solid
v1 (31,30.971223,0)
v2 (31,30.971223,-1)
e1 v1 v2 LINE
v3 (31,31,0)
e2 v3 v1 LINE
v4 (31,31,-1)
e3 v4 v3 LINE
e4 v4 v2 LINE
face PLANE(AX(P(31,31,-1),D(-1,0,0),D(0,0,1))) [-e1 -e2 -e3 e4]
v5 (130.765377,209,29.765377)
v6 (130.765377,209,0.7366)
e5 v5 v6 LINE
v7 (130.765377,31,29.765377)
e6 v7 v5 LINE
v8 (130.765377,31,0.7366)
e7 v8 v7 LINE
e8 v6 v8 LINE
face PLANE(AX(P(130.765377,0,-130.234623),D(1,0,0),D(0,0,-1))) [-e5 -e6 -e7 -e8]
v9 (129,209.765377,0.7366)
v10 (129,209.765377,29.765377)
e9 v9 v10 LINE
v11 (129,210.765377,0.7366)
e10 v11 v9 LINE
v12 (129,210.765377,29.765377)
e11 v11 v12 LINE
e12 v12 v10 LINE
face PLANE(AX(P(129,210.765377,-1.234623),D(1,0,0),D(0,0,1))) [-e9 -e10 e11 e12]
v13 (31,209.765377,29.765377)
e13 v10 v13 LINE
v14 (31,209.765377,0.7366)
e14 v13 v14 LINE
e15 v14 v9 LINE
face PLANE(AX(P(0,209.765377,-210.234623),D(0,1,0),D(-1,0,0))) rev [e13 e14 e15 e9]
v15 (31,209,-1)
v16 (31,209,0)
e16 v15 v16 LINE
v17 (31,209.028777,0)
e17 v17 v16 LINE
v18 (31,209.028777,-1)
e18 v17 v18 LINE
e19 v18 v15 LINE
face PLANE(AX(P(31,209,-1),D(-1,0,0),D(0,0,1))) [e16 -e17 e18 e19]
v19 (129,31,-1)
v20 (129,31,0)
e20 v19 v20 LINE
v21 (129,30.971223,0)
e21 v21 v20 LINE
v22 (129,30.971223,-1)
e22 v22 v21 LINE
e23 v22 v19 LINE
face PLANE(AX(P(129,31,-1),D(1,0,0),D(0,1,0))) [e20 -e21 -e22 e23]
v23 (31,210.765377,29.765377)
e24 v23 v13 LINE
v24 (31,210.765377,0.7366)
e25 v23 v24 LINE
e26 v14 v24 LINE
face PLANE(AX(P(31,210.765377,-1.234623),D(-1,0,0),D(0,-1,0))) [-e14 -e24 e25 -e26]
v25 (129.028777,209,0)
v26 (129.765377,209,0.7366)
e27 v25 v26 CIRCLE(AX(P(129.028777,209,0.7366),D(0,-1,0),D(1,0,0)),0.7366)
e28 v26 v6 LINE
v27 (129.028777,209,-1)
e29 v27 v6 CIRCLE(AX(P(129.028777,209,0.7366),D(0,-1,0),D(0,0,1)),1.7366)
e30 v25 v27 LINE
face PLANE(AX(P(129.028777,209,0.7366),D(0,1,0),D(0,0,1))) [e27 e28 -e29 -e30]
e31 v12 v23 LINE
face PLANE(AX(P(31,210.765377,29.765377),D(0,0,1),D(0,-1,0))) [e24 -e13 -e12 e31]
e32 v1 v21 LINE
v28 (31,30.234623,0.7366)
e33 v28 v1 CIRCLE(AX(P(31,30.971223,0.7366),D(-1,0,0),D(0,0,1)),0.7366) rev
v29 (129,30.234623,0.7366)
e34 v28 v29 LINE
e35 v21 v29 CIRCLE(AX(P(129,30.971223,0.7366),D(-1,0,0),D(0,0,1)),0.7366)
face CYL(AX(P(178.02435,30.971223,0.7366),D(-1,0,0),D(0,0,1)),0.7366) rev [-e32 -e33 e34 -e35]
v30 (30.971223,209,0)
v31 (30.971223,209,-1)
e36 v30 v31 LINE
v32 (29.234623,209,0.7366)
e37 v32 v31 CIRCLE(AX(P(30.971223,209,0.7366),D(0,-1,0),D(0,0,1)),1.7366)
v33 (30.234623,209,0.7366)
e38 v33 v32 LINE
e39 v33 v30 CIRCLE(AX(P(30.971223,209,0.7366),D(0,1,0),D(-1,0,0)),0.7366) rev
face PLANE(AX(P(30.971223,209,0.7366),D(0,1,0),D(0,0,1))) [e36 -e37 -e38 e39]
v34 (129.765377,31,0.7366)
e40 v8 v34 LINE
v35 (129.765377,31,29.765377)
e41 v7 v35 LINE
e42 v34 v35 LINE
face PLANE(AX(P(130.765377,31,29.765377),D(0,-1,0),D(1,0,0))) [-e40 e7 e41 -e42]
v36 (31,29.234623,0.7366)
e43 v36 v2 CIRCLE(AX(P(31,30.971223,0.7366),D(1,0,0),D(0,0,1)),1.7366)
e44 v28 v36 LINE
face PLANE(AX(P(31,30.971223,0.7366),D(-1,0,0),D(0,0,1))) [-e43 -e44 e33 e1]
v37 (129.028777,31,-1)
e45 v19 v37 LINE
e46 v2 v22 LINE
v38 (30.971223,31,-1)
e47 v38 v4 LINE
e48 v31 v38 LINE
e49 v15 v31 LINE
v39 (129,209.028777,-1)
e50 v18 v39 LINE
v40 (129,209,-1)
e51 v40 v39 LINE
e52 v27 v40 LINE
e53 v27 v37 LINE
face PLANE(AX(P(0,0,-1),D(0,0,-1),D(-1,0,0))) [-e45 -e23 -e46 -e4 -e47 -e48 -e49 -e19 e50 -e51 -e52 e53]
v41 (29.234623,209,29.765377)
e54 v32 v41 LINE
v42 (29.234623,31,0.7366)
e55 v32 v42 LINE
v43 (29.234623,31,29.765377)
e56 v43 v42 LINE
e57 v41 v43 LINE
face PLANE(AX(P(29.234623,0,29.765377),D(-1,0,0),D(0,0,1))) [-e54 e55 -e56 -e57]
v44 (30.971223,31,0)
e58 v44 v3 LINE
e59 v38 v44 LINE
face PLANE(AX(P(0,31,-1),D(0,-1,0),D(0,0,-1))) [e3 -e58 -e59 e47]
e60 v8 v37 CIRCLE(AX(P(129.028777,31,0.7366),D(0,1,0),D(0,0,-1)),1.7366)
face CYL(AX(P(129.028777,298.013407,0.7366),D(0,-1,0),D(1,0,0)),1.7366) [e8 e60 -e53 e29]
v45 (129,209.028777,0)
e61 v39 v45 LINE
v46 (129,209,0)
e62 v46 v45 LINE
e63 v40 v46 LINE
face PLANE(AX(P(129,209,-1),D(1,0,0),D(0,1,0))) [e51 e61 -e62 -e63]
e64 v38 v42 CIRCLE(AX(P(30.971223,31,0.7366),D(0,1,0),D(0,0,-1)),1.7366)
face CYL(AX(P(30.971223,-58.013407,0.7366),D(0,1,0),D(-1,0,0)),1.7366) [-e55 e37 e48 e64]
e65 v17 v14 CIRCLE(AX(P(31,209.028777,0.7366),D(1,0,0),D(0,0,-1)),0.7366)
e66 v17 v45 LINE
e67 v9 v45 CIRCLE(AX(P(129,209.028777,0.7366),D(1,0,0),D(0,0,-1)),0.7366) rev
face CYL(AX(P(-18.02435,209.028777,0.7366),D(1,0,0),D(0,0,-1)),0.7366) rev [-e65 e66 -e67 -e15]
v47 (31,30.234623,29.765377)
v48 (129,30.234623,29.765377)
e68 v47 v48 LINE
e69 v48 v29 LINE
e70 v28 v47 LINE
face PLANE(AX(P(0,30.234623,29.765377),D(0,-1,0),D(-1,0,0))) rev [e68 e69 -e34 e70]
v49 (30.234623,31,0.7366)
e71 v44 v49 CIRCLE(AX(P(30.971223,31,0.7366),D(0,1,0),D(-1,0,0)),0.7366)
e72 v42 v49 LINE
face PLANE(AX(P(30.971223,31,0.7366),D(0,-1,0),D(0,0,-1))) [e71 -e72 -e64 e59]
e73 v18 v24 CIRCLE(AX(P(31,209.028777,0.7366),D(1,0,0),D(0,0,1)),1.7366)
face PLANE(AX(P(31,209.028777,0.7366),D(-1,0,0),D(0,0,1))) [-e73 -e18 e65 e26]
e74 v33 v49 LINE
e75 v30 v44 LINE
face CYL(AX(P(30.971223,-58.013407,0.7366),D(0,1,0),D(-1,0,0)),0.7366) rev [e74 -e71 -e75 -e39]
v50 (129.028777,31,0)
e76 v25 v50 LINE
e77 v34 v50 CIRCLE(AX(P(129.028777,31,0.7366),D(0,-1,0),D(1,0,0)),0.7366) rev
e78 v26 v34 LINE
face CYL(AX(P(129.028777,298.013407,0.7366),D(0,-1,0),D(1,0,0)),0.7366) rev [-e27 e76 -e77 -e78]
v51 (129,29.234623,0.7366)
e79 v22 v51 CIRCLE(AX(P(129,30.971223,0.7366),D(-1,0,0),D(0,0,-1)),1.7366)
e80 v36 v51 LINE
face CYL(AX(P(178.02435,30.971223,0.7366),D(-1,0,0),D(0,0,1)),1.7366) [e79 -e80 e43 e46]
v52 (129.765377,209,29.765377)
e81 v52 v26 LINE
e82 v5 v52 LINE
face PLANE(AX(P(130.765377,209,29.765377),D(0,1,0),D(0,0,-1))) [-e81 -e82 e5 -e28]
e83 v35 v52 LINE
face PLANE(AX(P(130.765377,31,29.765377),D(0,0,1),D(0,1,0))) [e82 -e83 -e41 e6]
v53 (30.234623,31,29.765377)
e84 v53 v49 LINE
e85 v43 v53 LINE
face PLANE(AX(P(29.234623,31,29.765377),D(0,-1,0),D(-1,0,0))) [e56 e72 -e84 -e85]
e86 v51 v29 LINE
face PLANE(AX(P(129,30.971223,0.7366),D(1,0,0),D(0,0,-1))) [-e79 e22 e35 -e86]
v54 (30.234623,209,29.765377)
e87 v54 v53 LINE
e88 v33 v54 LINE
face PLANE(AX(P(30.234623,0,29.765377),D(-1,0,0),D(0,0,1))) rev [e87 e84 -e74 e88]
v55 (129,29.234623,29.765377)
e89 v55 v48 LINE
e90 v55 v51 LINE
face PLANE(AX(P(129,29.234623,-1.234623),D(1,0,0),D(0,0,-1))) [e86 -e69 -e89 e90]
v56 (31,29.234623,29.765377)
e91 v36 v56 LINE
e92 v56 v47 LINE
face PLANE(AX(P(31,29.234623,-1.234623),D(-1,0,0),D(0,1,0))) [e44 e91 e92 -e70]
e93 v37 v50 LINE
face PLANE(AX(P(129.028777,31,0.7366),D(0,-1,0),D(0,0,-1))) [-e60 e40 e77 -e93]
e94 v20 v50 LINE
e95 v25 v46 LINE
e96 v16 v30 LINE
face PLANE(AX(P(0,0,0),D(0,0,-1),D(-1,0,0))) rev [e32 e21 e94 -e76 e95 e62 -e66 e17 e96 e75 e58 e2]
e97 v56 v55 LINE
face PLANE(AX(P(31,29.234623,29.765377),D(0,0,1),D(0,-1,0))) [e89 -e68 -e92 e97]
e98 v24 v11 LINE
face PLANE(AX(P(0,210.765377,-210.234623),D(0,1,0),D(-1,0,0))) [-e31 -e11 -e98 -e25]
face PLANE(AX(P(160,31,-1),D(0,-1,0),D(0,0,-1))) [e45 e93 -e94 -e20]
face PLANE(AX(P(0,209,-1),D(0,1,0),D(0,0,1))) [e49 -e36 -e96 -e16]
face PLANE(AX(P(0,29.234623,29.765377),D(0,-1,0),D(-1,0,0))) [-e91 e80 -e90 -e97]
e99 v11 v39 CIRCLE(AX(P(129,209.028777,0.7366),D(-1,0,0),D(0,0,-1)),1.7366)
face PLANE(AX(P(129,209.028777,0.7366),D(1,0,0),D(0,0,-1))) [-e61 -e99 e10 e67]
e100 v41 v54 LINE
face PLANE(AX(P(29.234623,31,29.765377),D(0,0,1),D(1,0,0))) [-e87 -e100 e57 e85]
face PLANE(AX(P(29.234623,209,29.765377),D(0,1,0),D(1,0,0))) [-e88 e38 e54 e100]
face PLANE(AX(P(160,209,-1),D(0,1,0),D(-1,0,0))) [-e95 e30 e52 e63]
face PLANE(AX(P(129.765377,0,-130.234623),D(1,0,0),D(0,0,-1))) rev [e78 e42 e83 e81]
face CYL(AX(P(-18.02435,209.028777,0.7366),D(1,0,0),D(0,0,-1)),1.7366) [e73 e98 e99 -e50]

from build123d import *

# Parameters (mm, degrees)
BASE_FLANGE1_DEPTH         = 1
SKETCHED_START             = 31
SKETCHED_BEND1_DEPTH       = 178
SKETCHED_BEND1_2_DEPTH     = 98
SKETCHED_BEND1_3_DEPTH     = 178
SKETCHED_BEND1_4_OUTLINE_W = 98
SKETCHED_BEND1_4_OUTLINE_H = 1
SKETCHED_BEND1_4_DEPTH     = 29.234623369
SKETCHED_START_2           = 210.765376631
SKETCHED_BEND1_5_OUTLINE_W = 98
SKETCHED_BEND1_5_OUTLINE_H = 1
SKETCHED_BEND1_5_DEPTH     = 29.234623369
SKETCHED_BEND1_6_DEPTH     = 98
SKETCHED_BEND1_7_OUTLINE_W = 178
SKETCHED_BEND1_7_OUTLINE_H = 1
SKETCHED_BEND1_7_DEPTH     = 29.234623369
SKETCHED_START_3           = 130.765376631
SKETCHED_BEND1_8_OUTLINE_W = 178
SKETCHED_BEND1_8_OUTLINE_H = 1
SKETCHED_BEND1_8_DEPTH     = 29.234623369


# Read off the part's stored shape, not the designer's step: Sketched Bend1
# Sheet-metal steps are written as plain solids
with BuildPart() as part:
    # Sketch1 → Base-Flange1 (new body)
    with BuildSketch(Plane.XY):
        Polygon((0, 209), (31, 209), (31, 240), (129, 240), (129, 209), (160, 209), (160, 31), (129, 31), (129, 0), (31, 0), (31, 31), (0, 31), align=None)
    extrude(amount=-BASE_FLANGE1_DEPTH)

    # Sketched Bend1 outline → Sketched Bend1 (add)
    with BuildSketch(Plane(origin=(0, 0, 0), x_dir=(1, 0, 0), z_dir=(0, 1, 0)).offset(SKETCHED_START)):
        with BuildLine():
            Line((29.234623369, -0.7366), (29.234623369, -29.765376631))
            Line((29.234623369, -29.765376631), (30.234623369, -29.765376631))
            Line((30.234623369, -29.765376631), (30.234623369, -0.7366))
            ThreePointArc((30.234623369, -0.7366), (30.450368514, -0.215745145), (30.971223369, 0))
            Line((30.971223369, 0), (29.398582279, 0))
            ThreePointArc((29.398582279, 0), (29.276108612, -0.359286442), (29.234623369, -0.7366))
        make_face()
        with BuildLine():
            Line((130.601417721, 0), (129.028776631, 0))
            ThreePointArc((129.028776631, 0), (129.549631486, -0.215745145), (129.765376631, -0.7366))
            Line((129.765376631, -0.7366), (129.765376631, -29.765376631))
            Line((129.765376631, -29.765376631), (130.765376631, -29.765376631))
            Line((130.765376631, -29.765376631), (130.765376631, -0.7366))
            ThreePointArc((130.765376631, -0.7366), (130.723891388, -0.359286442), (130.601417721, 0))
        make_face()
    extrude(amount=SKETCHED_BEND1_DEPTH)

    # Sketched Bend1 2 outline → Sketched Bend1 2 (add)
    with BuildSketch(Plane.YZ.offset(SKETCHED_START)):
        with BuildLine():
            Line((209.028776631, 0), (210.601417721, 0))
            ThreePointArc((210.601417721, 0), (210.723891388, 0.359286442), (210.765376631, 0.7366))
            Line((210.765376631, 0.7366), (210.765376631, 29.765376631))
            Line((210.765376631, 29.765376631), (209.765376631, 29.765376631))
            Line((209.765376631, 29.765376631), (209.765376631, 0.7366))
            ThreePointArc((209.765376631, 0.7366), (209.549631486, 0.215745145), (209.028776631, 0))
        make_face()
        with BuildLine():
            ThreePointArc((29.234623369, 0.7366), (29.276108612, 0.359286442), (29.398582279, 0))
            Line((29.398582279, 0), (30.971223369, 0))
            ThreePointArc((30.971223369, 0), (30.450368514, 0.215745145), (30.234623369, 0.7366))
            Line((30.234623369, 0.7366), (30.234623369, 29.765376631))
            Line((30.234623369, 29.765376631), (29.234623369, 29.765376631))
            Line((29.234623369, 29.765376631), (29.234623369, 0.7366))
        make_face()
    extrude(amount=SKETCHED_BEND1_2_DEPTH)

    # Sketched Bend1 3 outline → Sketched Bend1 3 (cut)
    with BuildSketch(Plane(origin=(0, 0, 0), x_dir=(1, 0, 0), z_dir=(0, 1, 0)).offset(SKETCHED_START)):
        with BuildLine():
            Line((0, 0), (29.398582279, 0))
            ThreePointArc((29.398582279, 0), (30.039397205, 0.728828115), (30.971223369, 1))
            Line((30.971223369, 1), (0, 1))
            Line((0, 1), (0, 0))
        make_face()
        with BuildLine():
            Line((160, 1), (129.028776631, 1))
            ThreePointArc((129.028776631, 1), (129.960602795, 0.728828115), (130.601417721, 0))
            Line((130.601417721, 0), (160, 0))
            Line((160, 0), (160, 1))
        make_face()
    extrude(amount=SKETCHED_BEND1_3_DEPTH, mode=Mode.SUBTRACT)

    # Sketched Bend1 4 outline → Sketched Bend1 4 (cut)
    with BuildSketch(Plane(origin=(0, 0, 0), x_dir=(1, 0, 0), z_dir=(0, 1, 0))):
        with Locations((80, 0.5)):
            Rectangle(SKETCHED_BEND1_4_OUTLINE_W, SKETCHED_BEND1_4_OUTLINE_H)
    extrude(amount=SKETCHED_BEND1_4_DEPTH, mode=Mode.SUBTRACT)

    # Sketched Bend1 5 outline → Sketched Bend1 5 (cut)
    with BuildSketch(Plane(origin=(0, 0, 0), x_dir=(1, 0, 0), z_dir=(0, 1, 0)).offset(SKETCHED_START_2)):
        with Locations((80, 0.5)):
            Rectangle(SKETCHED_BEND1_5_OUTLINE_W, SKETCHED_BEND1_5_OUTLINE_H)
    extrude(amount=SKETCHED_BEND1_5_DEPTH, mode=Mode.SUBTRACT)

    # Sketched Bend1 6 outline → Sketched Bend1 6 (cut)
    with BuildSketch(Plane.YZ.offset(SKETCHED_START)):
        with BuildLine():
            ThreePointArc((210.601417721, 0), (209.960602795, -0.728828115), (209.028776631, -1))
            Line((209.028776631, -1), (240, -1))
            Line((240, -1), (240, 0))
            Line((240, 0), (210.601417721, 0))
        make_face()
        with BuildLine():
            Line((0, -1), (30.971223369, -1))
            ThreePointArc((30.971223369, -1), (30.039397205, -0.728828115), (29.398582279, 0))
            Line((29.398582279, 0), (0, 0))
            Line((0, 0), (0, -1))
        make_face()
    extrude(amount=SKETCHED_BEND1_6_DEPTH, mode=Mode.SUBTRACT)

    # Sketched Bend1 7 outline → Sketched Bend1 7 (cut)
    with BuildSketch(Plane.YZ):
        with Locations((120, -0.5)):
            Rectangle(SKETCHED_BEND1_7_OUTLINE_W, SKETCHED_BEND1_7_OUTLINE_H)
    extrude(amount=SKETCHED_BEND1_7_DEPTH, mode=Mode.SUBTRACT)

    # Sketched Bend1 8 outline → Sketched Bend1 8 (cut)
    with BuildSketch(Plane.YZ.offset(SKETCHED_START_3)):
        with Locations((120, -0.5)):
            Rectangle(SKETCHED_BEND1_8_OUTLINE_W, SKETCHED_BEND1_8_OUTLINE_H)
    extrude(amount=SKETCHED_BEND1_8_DEPTH, mode=Mode.SUBTRACT)


solid = part.part
